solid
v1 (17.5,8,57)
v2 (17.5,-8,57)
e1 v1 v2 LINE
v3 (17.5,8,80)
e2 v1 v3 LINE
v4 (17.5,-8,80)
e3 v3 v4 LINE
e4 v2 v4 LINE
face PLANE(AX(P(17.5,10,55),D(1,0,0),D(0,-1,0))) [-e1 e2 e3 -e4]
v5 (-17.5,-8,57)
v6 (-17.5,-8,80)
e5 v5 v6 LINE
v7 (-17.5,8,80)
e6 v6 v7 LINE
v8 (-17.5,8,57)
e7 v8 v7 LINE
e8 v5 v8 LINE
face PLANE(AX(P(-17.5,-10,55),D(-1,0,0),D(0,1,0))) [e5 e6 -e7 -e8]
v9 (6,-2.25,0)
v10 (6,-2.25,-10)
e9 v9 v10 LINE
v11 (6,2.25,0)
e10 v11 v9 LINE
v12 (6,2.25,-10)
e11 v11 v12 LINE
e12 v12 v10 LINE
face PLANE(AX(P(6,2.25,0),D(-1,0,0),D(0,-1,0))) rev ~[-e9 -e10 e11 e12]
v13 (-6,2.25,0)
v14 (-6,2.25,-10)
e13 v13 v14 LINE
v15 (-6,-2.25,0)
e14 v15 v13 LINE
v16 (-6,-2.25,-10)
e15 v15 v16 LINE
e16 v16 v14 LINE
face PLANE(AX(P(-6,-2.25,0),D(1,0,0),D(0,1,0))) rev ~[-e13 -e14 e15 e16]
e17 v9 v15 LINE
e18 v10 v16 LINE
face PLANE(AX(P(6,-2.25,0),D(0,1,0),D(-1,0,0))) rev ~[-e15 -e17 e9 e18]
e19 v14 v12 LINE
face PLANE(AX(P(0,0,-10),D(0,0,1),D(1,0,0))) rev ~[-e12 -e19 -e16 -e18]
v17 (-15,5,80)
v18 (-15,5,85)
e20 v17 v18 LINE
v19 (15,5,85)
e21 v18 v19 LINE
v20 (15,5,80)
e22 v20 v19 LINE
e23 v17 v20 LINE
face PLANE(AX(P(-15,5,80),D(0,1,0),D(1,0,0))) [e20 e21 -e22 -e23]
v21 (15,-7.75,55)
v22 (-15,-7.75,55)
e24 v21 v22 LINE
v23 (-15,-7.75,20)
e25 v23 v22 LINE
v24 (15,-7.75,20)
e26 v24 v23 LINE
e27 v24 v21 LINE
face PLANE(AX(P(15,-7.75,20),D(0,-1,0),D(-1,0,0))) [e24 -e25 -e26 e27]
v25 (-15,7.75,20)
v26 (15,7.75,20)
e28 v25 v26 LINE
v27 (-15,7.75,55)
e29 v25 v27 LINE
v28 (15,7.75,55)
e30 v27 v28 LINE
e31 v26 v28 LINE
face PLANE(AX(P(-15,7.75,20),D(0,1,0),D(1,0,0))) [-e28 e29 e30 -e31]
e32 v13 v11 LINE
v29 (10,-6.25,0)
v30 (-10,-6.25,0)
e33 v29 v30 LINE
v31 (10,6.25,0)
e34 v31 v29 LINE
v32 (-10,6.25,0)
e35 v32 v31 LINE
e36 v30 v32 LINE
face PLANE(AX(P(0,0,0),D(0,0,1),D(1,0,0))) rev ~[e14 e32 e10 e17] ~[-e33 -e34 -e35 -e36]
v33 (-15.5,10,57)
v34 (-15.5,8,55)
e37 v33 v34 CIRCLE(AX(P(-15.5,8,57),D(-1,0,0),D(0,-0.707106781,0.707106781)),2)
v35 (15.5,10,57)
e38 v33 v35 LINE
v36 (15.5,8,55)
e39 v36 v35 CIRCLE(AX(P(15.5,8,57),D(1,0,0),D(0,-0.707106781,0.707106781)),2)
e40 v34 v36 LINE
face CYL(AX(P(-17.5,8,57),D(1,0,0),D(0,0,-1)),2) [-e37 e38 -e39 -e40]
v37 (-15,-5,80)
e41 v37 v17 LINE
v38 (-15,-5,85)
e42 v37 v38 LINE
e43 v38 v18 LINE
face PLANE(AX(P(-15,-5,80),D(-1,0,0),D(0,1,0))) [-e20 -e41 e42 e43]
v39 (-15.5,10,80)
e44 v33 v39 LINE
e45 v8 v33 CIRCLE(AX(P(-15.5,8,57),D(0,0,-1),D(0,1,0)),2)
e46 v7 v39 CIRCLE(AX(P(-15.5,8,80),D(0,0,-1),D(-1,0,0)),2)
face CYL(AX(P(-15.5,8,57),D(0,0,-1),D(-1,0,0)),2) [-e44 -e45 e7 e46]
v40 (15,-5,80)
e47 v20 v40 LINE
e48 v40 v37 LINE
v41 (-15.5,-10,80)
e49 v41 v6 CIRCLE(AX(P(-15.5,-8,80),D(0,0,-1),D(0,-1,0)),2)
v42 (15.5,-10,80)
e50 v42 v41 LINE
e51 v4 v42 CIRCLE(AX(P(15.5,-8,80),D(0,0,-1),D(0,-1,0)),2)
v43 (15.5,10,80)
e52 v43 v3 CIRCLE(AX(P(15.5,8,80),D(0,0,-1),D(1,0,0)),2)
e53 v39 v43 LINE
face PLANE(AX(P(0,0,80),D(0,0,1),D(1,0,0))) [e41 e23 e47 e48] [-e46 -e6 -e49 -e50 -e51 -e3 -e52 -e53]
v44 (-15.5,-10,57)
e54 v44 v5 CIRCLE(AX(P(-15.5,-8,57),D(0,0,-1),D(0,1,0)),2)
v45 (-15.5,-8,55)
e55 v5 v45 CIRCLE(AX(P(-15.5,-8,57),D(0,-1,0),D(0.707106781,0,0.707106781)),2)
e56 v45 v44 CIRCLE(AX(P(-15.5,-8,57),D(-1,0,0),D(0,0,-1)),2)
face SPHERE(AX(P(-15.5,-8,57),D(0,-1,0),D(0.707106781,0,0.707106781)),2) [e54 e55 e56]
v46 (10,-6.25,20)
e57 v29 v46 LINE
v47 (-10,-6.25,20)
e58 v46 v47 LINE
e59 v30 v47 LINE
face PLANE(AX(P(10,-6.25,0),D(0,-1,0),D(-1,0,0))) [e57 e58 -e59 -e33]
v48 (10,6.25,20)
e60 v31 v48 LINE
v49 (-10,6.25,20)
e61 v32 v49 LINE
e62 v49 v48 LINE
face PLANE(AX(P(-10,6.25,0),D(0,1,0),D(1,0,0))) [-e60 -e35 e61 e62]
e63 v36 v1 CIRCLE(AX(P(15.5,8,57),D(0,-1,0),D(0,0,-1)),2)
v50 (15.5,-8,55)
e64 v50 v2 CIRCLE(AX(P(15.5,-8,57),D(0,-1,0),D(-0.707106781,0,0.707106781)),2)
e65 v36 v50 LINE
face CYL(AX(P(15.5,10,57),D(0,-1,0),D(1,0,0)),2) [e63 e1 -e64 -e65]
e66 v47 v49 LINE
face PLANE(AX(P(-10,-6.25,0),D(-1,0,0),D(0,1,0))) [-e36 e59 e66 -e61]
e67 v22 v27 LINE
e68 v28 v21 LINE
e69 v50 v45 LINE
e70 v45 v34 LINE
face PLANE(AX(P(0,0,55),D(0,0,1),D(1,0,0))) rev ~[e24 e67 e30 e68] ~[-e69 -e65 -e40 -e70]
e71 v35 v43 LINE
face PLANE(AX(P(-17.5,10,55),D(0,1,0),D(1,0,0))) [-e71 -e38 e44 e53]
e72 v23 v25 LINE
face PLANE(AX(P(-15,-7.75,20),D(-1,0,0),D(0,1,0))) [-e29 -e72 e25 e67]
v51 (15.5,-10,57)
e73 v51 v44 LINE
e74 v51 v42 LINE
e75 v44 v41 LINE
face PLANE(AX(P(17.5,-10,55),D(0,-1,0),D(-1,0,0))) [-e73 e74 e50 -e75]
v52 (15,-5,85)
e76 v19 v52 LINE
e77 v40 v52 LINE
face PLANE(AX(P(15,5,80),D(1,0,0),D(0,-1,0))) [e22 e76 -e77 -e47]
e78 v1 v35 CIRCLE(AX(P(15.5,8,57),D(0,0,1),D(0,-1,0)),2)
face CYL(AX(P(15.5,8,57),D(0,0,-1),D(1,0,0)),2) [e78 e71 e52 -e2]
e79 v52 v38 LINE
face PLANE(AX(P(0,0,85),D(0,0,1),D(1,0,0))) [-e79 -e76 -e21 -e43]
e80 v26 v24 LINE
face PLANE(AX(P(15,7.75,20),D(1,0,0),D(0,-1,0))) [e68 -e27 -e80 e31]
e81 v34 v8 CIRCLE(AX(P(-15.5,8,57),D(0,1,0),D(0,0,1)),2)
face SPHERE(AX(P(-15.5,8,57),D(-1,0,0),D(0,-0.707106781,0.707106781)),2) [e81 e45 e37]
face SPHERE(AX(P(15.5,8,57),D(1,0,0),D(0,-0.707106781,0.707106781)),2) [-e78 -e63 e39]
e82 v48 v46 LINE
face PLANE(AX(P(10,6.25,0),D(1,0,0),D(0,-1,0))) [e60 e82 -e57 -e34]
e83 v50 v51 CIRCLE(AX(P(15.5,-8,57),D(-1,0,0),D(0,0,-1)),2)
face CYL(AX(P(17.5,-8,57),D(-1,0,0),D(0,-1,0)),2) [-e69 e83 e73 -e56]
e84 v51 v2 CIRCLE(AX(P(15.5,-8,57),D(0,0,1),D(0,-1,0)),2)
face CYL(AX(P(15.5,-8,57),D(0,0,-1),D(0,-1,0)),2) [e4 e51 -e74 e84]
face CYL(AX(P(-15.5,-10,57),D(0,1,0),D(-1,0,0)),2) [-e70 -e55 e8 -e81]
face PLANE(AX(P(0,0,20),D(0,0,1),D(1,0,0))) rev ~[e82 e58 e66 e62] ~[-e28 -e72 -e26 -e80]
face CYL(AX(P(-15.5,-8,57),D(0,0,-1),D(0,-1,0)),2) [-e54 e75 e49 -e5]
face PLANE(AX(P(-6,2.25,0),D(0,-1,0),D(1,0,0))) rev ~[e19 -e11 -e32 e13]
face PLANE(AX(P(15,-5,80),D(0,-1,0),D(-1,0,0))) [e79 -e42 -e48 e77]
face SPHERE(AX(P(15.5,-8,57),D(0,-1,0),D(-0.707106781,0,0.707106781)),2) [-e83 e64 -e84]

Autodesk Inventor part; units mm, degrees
ref_plane "YZ Plane" through (0, 0, 0) normal (1, 0, 0) x (0, 1, 0)
ref_plane "XZ Plane" through (0, 0, 0) normal (0, 1, 0) x (-1, 0, 0)
ref_plane "XY Plane" through (0, 0, 0) normal (0, 0, 1) x (1, 0, 0)
sketch "Szkic1" plane through (0, 0, 0) normal (0, 0, 1) x (1, 0, 0)
  line L0 (6, -2.25) -> (-6, -2.25)
  line L1 (-6, -2.25) -> (-6, 2.25)
  line L2 (-6, 2.25) -> (6, 2.25)
  line L3 (6, 2.25) -> (6, -2.25)
  line L4 (6, -2.25) -> (-6, 2.25) construction
  line L5 (-6, -2.25) -> (6, 2.25) construction
  line L6 (6, -2.25) -> (-6, -2.25)
  line L7 (-6, -2.25) -> (-6, 2.25)
  line L8 (-6, 2.25) -> (6, 2.25)
  line L9 (6, 2.25) -> (6, -2.25)
  line L10 (6, -2.25) -> (-6, 2.25) construction
  line L11 (-6, -2.25) -> (6, 2.25) construction
  point P0 (0, 0)
  dimension "d0" = 12
  dimension "d1" = 4.5
extrude "Wyciągnięcie proste1" add sketch "Szkic1" against normal blind 10
sketch "Szkic2" plane through (0, 0, -10) normal (0, 0, -1) x (-1, 0, 0)
  line L0 (6, 2.25) -> (-6, 2.25) projected
  line L1 (6, -2.25) -> (-6, -2.25)
  line L2 (-6, -2.25) -> (-6, 2.25)
  line L3 (-6, 2.25) -> (6, 2.25)
  line L4 (6, 2.25) -> (6, -2.25)
  line L5 (6, -2.25) -> (-6, 2.25) construction
  line L6 (-6, -2.25) -> (6, 2.25) construction
  point P0 (0, 0)
sketch "Szkic3" plane through (0, 0, 0) normal (0, 0, 1) x (1, 0, 0)
  line L0 (10, -6.25) -> (-10, -6.25)
  line L1 (-10, -6.25) -> (-10, 6.25)
  line L2 (-10, 6.25) -> (10, 6.25)
  line L3 (10, 6.25) -> (10, -6.25)
  line L4 (10, -6.25) -> (-10, 6.25) construction
  line L5 (-10, -6.25) -> (10, 6.25) construction
  point P0 (0, 0)
  dimension "d4" = 20
  dimension "d5" = 12.5
extrude "Wyciągnięcie proste2" add sketch "Szkic3" along normal blind 20
sketch "Szkic5" plane through (0, 0, 20) normal (0, 0, 1) x (1, 0, 0)
  line L0 (15, -7.75) -> (-15, -7.75)
  line L1 (-15, -7.75) -> (-15, 7.75)
  line L2 (-15, 7.75) -> (15, 7.75)
  line L3 (15, 7.75) -> (15, -7.75)
  line L4 (15, -7.75) -> (-15, 7.75) construction
  line L5 (-15, -7.75) -> (15, 7.75) construction
  point P0 (0, 0)
  dimension "d8" = 15.5
  dimension "d9" = 30
extrude "Wyciągnięcie proste3" add sketch "Szkic5" along normal blind 35
sketch "Szkic6" plane through (0, 0, 55) normal (0, 0, 1) x (1, 0, 0)
  line L0 (17.5, -10) -> (-17.5, -10)
  line L1 (-17.5, -10) -> (-17.5, 10)
  line L2 (-17.5, 10) -> (17.5, 10)
  line L3 (17.5, 10) -> (17.5, -10)
  line L4 (17.5, -10) -> (-17.5, 10) construction
  line L5 (-17.5, -10) -> (17.5, 10) construction
  point P0 (0, 0)
  dimension "d12" = 20
  dimension "d13" = 35
extrude "Wyciągnięcie proste4" add sketch "Szkic6" along normal blind 25
sketch "Szkic7" plane through (0, 0, 80) normal (0, 0, 1) x (1, 0, 0)
  line L0 (15, -5) -> (-15, -5)
  line L1 (-15, -5) -> (-15, 5)
  line L2 (-15, 5) -> (15, 5)
  line L3 (15, 5) -> (15, -5)
  line L4 (15, -5) -> (-15, 5) construction
  line L5 (-15, -5) -> (15, 5) construction
  point P0 (0, 0)
  dimension "d16" = 10
  dimension "d17" = 30
extrude "Wyciągnięcie proste5" add sketch "Szkic7" along normal blind 5
fillet "Zaokrąglenie1" radius 2 4 edges at (0, 10, 55) (-17.5, 0, 55) (17.5, 0, 55) (0, -10, 55)
fillet "Zaokrąglenie2" radius 2 8 edges at (16.9142, 9.4142, 55.5858) (17.5, 10, 68.5) (-16.9142, 9.4142, 55.5858) (-17.5, 10, 68.5) (16.9142, -9.4142, 55.5858) (17.5, -10, 68.5) (-16.9142, -9.4142, 55.5858) (-17.5, -10, 68.5)
properties part number "USB2Dynamixel-XD"
